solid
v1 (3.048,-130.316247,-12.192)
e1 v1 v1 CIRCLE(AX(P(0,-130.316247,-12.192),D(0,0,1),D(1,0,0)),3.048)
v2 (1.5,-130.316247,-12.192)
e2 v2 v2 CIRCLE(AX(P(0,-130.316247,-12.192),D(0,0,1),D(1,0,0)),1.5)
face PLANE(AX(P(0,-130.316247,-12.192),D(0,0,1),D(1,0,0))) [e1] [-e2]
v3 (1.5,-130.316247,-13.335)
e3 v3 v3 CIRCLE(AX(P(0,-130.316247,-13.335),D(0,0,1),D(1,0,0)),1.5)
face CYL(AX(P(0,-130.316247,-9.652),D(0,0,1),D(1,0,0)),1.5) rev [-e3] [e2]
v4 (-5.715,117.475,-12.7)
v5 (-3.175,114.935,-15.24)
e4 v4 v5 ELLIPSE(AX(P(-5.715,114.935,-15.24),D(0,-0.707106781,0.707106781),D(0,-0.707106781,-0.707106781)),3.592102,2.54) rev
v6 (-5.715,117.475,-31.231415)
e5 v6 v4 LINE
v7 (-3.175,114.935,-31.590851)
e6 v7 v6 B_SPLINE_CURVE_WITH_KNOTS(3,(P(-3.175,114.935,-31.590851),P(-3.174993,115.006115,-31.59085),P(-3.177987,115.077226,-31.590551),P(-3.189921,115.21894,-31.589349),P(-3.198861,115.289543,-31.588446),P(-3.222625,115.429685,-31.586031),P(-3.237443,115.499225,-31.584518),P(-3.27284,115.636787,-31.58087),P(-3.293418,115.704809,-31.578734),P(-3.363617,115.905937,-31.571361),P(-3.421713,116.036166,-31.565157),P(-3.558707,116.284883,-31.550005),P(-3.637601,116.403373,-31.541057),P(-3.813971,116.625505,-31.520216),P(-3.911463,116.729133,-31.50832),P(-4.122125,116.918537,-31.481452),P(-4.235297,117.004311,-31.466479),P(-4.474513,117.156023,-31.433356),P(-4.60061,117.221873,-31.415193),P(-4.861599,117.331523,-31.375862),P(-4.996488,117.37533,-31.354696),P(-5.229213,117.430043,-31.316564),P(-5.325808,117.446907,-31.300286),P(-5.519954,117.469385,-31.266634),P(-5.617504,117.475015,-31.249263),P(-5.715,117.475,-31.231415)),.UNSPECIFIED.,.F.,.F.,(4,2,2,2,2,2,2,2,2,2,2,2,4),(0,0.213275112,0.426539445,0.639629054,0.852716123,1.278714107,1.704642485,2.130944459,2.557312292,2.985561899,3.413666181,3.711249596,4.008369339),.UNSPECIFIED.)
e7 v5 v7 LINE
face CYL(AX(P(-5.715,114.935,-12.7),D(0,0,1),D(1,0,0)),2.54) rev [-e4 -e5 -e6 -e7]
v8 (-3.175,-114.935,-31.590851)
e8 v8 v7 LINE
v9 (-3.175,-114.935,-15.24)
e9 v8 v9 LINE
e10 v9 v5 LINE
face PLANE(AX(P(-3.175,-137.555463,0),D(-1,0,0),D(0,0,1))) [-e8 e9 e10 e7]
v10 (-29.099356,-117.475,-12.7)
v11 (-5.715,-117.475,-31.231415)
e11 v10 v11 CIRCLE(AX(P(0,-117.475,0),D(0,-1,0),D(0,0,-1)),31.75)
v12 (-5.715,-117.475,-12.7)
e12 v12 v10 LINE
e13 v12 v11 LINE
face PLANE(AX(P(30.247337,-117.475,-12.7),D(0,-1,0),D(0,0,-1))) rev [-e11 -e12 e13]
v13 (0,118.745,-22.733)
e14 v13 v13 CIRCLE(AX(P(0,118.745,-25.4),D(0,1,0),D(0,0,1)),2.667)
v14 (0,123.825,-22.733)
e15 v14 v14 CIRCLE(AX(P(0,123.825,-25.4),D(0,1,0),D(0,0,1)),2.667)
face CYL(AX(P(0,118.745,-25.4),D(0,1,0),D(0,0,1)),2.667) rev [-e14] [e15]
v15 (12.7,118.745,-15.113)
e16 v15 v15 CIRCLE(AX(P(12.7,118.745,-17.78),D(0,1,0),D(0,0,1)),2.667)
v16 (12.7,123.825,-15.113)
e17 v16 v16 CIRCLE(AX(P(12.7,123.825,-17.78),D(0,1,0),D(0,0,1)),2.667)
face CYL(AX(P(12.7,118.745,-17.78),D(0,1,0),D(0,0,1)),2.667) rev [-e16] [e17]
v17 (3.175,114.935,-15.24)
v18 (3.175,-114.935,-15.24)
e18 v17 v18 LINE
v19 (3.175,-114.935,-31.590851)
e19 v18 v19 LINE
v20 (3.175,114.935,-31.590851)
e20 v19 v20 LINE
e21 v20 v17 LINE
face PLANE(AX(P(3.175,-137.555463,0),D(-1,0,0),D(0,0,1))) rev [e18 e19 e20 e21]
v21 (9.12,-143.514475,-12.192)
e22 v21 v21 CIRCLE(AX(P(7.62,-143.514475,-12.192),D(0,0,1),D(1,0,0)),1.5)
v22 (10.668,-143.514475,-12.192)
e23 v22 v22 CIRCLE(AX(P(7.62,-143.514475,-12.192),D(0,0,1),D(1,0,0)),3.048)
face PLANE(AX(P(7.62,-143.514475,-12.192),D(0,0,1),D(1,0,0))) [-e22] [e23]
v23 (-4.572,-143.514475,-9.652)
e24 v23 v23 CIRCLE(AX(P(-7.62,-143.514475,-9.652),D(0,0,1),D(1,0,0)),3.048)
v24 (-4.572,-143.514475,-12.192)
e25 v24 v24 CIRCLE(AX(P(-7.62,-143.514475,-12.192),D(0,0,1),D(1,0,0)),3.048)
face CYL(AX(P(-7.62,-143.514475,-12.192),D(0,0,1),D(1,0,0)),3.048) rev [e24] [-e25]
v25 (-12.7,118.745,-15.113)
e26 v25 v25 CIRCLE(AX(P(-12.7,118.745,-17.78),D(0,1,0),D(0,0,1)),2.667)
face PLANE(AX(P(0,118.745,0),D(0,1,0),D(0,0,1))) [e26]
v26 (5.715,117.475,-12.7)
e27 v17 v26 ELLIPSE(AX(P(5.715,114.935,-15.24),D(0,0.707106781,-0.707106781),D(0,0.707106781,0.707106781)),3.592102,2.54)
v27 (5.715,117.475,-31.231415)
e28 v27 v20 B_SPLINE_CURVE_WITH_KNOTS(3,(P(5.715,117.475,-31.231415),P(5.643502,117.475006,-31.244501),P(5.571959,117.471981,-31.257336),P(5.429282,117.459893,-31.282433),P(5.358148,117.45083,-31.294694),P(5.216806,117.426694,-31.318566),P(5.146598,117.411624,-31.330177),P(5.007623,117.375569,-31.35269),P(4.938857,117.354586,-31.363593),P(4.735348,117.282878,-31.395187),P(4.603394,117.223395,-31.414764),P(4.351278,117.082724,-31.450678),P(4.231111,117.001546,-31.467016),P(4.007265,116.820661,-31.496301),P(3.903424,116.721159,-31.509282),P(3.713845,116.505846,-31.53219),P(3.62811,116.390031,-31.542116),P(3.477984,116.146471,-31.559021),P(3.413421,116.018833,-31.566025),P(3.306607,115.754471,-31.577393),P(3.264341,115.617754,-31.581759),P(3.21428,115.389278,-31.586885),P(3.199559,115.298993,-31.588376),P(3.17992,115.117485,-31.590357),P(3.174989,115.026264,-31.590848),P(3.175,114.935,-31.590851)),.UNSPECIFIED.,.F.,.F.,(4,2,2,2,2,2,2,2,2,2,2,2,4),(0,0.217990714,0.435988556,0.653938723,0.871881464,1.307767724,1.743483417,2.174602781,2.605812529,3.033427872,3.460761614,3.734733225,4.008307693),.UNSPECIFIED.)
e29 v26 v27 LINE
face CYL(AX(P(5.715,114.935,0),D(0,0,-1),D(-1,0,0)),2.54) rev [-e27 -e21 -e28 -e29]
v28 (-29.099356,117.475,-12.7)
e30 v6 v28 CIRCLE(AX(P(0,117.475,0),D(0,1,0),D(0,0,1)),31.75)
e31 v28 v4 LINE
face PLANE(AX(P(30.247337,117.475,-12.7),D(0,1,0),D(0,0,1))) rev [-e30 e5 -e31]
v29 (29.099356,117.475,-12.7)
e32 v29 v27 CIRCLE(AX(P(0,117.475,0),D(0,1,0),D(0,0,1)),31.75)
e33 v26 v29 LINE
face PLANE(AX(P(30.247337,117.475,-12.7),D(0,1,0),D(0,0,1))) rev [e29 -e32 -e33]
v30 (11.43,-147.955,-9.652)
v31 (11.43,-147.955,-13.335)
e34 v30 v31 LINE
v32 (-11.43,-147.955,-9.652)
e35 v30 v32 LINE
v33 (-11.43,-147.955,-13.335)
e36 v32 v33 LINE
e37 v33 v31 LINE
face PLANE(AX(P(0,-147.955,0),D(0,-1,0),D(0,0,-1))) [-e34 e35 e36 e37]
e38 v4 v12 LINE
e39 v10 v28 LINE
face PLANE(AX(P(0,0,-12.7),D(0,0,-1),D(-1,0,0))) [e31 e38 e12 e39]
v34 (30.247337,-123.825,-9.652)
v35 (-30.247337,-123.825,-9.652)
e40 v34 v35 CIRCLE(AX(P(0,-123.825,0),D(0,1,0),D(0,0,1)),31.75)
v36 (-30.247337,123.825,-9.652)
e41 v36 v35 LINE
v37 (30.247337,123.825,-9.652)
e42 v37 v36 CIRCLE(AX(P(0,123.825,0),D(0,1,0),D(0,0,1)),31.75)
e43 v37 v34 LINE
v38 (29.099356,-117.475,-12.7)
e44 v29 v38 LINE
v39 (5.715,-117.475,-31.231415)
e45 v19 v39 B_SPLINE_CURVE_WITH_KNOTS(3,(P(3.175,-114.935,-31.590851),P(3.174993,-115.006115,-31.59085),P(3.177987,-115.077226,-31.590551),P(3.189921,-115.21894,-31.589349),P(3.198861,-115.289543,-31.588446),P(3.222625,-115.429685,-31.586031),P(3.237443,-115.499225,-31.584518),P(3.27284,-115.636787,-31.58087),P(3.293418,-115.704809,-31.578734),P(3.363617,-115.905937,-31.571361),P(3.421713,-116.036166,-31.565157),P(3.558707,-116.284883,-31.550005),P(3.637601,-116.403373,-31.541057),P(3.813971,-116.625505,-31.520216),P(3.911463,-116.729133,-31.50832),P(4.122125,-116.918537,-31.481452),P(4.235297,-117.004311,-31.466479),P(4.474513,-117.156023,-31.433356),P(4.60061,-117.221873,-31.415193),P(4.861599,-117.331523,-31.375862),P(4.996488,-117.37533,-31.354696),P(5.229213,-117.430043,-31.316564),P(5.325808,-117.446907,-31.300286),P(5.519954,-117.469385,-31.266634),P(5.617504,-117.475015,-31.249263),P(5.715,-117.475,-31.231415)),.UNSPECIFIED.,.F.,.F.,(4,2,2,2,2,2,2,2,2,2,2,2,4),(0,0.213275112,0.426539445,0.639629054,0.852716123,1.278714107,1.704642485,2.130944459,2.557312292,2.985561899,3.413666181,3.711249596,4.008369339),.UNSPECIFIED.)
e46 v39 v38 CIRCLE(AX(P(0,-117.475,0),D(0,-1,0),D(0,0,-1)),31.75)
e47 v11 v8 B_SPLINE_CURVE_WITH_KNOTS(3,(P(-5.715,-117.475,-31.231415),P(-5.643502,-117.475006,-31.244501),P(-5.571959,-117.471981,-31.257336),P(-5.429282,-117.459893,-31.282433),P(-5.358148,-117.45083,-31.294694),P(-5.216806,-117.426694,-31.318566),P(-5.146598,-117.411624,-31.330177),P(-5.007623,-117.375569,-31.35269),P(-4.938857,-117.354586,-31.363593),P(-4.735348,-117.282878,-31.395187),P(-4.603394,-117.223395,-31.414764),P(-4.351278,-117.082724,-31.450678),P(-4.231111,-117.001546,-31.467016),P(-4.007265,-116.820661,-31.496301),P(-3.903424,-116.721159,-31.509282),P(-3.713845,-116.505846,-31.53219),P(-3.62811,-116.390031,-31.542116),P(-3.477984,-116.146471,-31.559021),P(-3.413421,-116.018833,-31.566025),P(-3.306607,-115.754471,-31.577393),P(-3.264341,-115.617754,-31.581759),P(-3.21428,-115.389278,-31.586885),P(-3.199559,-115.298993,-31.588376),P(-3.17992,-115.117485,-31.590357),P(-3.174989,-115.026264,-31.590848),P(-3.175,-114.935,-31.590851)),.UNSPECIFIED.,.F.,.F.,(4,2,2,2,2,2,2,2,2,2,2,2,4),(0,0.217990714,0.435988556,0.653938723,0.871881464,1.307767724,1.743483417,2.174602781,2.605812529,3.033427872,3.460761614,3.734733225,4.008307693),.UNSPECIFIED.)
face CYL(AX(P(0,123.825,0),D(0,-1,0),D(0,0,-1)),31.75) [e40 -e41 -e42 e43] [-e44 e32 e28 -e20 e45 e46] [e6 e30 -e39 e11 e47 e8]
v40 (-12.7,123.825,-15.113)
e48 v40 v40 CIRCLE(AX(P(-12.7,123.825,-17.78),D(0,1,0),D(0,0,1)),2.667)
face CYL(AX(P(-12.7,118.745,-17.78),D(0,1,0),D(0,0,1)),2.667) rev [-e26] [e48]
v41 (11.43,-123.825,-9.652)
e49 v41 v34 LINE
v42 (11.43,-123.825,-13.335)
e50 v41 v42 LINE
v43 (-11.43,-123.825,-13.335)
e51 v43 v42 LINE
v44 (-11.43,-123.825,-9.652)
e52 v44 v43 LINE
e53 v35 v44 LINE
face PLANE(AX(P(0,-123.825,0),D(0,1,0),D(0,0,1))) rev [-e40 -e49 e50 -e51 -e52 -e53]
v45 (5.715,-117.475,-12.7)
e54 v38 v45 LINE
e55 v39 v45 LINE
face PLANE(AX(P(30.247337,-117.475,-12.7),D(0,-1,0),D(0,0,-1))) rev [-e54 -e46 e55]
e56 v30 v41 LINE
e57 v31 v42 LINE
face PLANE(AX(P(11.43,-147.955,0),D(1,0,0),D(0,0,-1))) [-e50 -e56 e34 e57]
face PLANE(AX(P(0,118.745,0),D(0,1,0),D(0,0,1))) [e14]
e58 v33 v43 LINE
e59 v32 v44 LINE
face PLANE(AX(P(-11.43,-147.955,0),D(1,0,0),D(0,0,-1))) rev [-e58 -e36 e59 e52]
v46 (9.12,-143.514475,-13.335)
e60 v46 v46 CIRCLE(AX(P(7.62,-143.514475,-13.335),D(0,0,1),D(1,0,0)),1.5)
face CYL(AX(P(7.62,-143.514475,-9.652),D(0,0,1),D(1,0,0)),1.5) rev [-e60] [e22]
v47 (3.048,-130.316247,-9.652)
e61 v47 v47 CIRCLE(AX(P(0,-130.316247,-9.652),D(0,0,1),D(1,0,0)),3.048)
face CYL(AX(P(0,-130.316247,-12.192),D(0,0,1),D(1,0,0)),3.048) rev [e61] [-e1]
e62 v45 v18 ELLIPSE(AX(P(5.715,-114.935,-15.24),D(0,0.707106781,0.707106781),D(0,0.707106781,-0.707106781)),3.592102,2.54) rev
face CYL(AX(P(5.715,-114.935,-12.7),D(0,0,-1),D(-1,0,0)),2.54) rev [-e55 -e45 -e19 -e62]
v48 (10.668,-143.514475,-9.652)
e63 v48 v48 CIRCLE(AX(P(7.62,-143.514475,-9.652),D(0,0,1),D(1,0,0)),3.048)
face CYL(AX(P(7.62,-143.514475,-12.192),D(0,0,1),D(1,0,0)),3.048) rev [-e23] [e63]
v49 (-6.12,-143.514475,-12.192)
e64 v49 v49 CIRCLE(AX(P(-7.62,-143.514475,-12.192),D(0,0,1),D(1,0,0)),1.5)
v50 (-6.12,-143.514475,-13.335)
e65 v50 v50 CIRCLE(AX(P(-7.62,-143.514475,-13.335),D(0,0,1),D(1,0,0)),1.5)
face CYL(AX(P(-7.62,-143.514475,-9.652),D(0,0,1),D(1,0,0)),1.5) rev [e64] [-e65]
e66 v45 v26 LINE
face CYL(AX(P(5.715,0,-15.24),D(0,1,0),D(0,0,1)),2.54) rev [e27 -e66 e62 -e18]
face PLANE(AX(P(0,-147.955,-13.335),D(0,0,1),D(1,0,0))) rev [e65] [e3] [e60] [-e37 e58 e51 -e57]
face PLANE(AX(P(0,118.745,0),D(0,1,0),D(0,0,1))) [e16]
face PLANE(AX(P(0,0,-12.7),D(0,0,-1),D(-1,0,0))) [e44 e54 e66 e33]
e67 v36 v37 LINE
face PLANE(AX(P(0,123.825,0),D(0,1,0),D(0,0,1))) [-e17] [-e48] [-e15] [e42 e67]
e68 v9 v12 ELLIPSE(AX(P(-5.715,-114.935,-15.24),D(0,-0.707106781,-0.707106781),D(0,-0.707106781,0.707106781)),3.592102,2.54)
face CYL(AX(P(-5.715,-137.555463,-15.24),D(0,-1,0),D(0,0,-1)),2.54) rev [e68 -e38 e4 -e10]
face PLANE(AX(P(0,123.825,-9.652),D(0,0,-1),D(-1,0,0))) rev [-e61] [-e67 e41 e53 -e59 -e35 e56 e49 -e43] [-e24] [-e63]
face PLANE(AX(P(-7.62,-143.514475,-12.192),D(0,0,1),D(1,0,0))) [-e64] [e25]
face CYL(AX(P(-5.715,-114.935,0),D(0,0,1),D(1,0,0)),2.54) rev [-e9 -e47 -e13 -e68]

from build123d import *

# Parameters (mm, degrees)
BOSS_EXTRUDE1_DEPTH   = 123.825
SKETCH2_W             = 22.86
SKETCH2_H             = 3.683
BOSS_EXTRUDE2_DEPTH   = 24.13
SKETCH8_R             = 2.667
CUT_EXTRUDE3_DEPTH    = 5.08
SKETCH3_R             = 3.048
CUT_EXTRUDE1_DEPTH    = 2.54
F_3_0MM_DOWEL_HOLE1_D = 3
SKETCH6_W             = 60.494674014
SKETCH6_H             = 234.95
CUT_EXTRUDE2_DEPTH    = 19.05
SKETCH7_W             = 6.35
SKETCH7_H             = 18.890851128
BOSS_EXTRUDE3_DEPTH   = 234.95
FILLET1_R             = 2.54


with BuildPart() as part:
    # Sketch1 → Boss-Extrude1 (new, symmetric)
    with BuildSketch(Plane(origin=(0, 0, 0), x_dir=(1, 0, 0), z_dir=(0, 1, 0))):
        with BuildLine():
            ThreePointArc((30.247337007, 9.652), (0, 31.75), (-30.247337007, 9.652))
            Line((-30.247337007, 9.652), (30.247337007, 9.652))
        make_face()
    extrude(amount=BOSS_EXTRUDE1_DEPTH, both=True)

    # Sketch2 → Boss-Extrude2 (add)
    with BuildSketch(Plane.XZ.offset(123.825)):
        with Locations((0, -11.4935)):
            Rectangle(SKETCH2_W, SKETCH2_H)
    extrude(amount=BOSS_EXTRUDE2_DEPTH)

    # Sketch8 → Cut-Extrude3 (cut)
    with BuildSketch(Plane(origin=(0, 123.825, 0), x_dir=(1, 0, 0), z_dir=(0, 1, 0))):
        with Locations(Location((0, 25.4, 0), (0, 0, 270))):
            Circle(SKETCH8_R)
        with Locations(Location((-12.7, 17.78, 0), (0, 0, 270))):
            Circle(SKETCH8_R)
        with Locations(Location((12.7, 17.78, 0), (0, 0, 270))):
            Circle(SKETCH8_R)
    extrude(amount=-CUT_EXTRUDE3_DEPTH, mode=Mode.SUBTRACT)

    # Sketch3 → Cut-Extrude1 (cut)
    with BuildSketch(Plane.XY.offset(-9.652)):
        with Locations((0, -130.316247378)):
            Circle(SKETCH3_R)
        with Locations((-7.62, -143.514474532)):
            Circle(SKETCH3_R)
        with Locations((7.62, -143.514474532)):
            Circle(SKETCH3_R)
    extrude(amount=-CUT_EXTRUDE1_DEPTH, mode=Mode.SUBTRACT)

    # Ø3.0mm Dowel Hole1 (through all)
    with Locations(Plane.XY.offset(-9.652)):
        with Locations((0, -130.316247378), (7.62, -143.514474532), (-7.62, -143.514474532)):
            Hole(F_3_0MM_DOWEL_HOLE1_D / 2)

    # Sketch6 → Cut-Extrude2 (cut)
    with BuildSketch(Plane(origin=(0, 0, -31.75), x_dir=(-1, 0, 0), z_dir=(0, 0, -1))):
        Rectangle(SKETCH6_W, SKETCH6_H)
    extrude(amount=-CUT_EXTRUDE2_DEPTH, mode=Mode.SUBTRACT)

    # Sketch7 → Boss-Extrude3 (add)
    with BuildSketch(Plane.XZ.offset(-117.475)):
        with BuildLine():
            ThreePointArc((-3.175, -31.590851128), (0, -31.75), (3.175, -31.590851128))
            Line((3.175, -31.590851128), (-3.175, -31.590851128))
        make_face()
        with Locations((0, -22.145425564)):
            Rectangle(SKETCH7_W, SKETCH7_H)
    extrude(amount=BOSS_EXTRUDE3_DEPTH)

    # Fillet1
    # the kernel refuses this fillet: 2.54 mm, written as the material it adds along each edge
    with BuildSketch(Plane(origin=(3.175, 117.475, -37.940851128), x_dir=(1, 0, 0), z_dir=(0, 0, 1))) as fillet1_piece_1_section:
        with BuildLine():
            CenterArc((FILLET1_R, -FILLET1_R), FILLET1_R, 90, 90)
            Line((0, -FILLET1_R), (0, 0))
            Line((0, 0), (FILLET1_R, 0))
        make_face()
    fillet1_piece_1 = extrude(amount=25.240851128, mode=Mode.PRIVATE)
    fillet1_piece_1 = fillet1_piece_1 & Plane(origin=(0, 116.898787332, 0), x_dir=(0.9526720317087093, 0, -0.3040000000000001), z_dir=(0, 1, 0)) * Cylinder(31.75, 61, mode=Mode.PRIVATE)
    add(fillet1_piece_1)
    with BuildSketch(Plane(origin=(3.175, -117.475, -37.940851128), x_dir=(1, 0, 0), z_dir=(0, 0, 1))) as fillet1_piece_2_section:
        with BuildLine():
            CenterArc((FILLET1_R, FILLET1_R), FILLET1_R, 180, 90)
            Line((0, FILLET1_R), (0, 0))
            Line((0, 0), (FILLET1_R, 0))
        make_face()
    fillet1_piece_2 = extrude(amount=25.240851128, mode=Mode.PRIVATE)
    fillet1_piece_2 = fillet1_piece_2 & Plane(origin=(0, -116.898787332, 0), x_dir=(0.9526720317087093, 0, -0.3040000000000001), z_dir=(0, 1, 0)) * Cylinder(31.75, 61, mode=Mode.PRIVATE)
    add(fillet1_piece_2)
    with BuildSketch(Plane(origin=(-3.175, 117.475, -12.7), x_dir=(-1, 0, 0), z_dir=(0, 0, -1))) as fillet1_piece_3_section:
        with BuildLine():
            CenterArc((FILLET1_R, -FILLET1_R), FILLET1_R, 90, 90)
            Line((0, -FILLET1_R), (0, 0))
            Line((0, 0), (FILLET1_R, 0))
        make_face()
    fillet1_piece_3 = extrude(amount=25.240851128, mode=Mode.PRIVATE)
    fillet1_piece_3 = fillet1_piece_3 & Plane(origin=(0, 116.898782869, 0), x_dir=(0.9526720317087093, 0, -0.3040000000000001), z_dir=(0, 1, 0)) * Cylinder(31.75, 61, mode=Mode.PRIVATE)
    add(fillet1_piece_3)
    with BuildSketch(Plane(origin=(-3.175, -117.475, -12.7), x_dir=(-1, 0, 0), z_dir=(0, 0, -1))) as fillet1_piece_4_section:
        with BuildLine():
            CenterArc((FILLET1_R, FILLET1_R), FILLET1_R, 180, 90)
            Line((0, FILLET1_R), (0, 0))
            Line((0, 0), (FILLET1_R, 0))
        make_face()
    fillet1_piece_4 = extrude(amount=25.240851128, mode=Mode.PRIVATE)
    fillet1_piece_4 = fillet1_piece_4 & Plane(origin=(0, -116.898782869, 0), x_dir=(0.9526720317087093, 0, -0.3040000000000001), z_dir=(0, 1, 0)) * Cylinder(31.75, 61, mode=Mode.PRIVATE)
    add(fillet1_piece_4)
    with BuildSketch(Plane(origin=(-3.175, 123.825, -12.7), x_dir=(-1, 0, 0), z_dir=(0, -1, 0))) as fillet1_piece_5:
        with BuildLine():
            CenterArc((FILLET1_R, FILLET1_R), FILLET1_R, 180, 90)
            Line((0, FILLET1_R), (0, 0))
            Line((0, 0), (FILLET1_R, 0))
        make_face()
    extrude(amount=247.65)
    with BuildSketch(Plane(origin=(3.175, 123.825, -12.7), x_dir=(1, 0, 0), z_dir=(0, -1, 0))) as fillet1_piece_6:
        with BuildLine():
            CenterArc((FILLET1_R, -FILLET1_R), FILLET1_R, 90, 90)
            Line((0, -FILLET1_R), (0, 0))
            Line((0, 0), (FILLET1_R, 0))
        make_face()
    extrude(amount=247.65)


solid = part.part
